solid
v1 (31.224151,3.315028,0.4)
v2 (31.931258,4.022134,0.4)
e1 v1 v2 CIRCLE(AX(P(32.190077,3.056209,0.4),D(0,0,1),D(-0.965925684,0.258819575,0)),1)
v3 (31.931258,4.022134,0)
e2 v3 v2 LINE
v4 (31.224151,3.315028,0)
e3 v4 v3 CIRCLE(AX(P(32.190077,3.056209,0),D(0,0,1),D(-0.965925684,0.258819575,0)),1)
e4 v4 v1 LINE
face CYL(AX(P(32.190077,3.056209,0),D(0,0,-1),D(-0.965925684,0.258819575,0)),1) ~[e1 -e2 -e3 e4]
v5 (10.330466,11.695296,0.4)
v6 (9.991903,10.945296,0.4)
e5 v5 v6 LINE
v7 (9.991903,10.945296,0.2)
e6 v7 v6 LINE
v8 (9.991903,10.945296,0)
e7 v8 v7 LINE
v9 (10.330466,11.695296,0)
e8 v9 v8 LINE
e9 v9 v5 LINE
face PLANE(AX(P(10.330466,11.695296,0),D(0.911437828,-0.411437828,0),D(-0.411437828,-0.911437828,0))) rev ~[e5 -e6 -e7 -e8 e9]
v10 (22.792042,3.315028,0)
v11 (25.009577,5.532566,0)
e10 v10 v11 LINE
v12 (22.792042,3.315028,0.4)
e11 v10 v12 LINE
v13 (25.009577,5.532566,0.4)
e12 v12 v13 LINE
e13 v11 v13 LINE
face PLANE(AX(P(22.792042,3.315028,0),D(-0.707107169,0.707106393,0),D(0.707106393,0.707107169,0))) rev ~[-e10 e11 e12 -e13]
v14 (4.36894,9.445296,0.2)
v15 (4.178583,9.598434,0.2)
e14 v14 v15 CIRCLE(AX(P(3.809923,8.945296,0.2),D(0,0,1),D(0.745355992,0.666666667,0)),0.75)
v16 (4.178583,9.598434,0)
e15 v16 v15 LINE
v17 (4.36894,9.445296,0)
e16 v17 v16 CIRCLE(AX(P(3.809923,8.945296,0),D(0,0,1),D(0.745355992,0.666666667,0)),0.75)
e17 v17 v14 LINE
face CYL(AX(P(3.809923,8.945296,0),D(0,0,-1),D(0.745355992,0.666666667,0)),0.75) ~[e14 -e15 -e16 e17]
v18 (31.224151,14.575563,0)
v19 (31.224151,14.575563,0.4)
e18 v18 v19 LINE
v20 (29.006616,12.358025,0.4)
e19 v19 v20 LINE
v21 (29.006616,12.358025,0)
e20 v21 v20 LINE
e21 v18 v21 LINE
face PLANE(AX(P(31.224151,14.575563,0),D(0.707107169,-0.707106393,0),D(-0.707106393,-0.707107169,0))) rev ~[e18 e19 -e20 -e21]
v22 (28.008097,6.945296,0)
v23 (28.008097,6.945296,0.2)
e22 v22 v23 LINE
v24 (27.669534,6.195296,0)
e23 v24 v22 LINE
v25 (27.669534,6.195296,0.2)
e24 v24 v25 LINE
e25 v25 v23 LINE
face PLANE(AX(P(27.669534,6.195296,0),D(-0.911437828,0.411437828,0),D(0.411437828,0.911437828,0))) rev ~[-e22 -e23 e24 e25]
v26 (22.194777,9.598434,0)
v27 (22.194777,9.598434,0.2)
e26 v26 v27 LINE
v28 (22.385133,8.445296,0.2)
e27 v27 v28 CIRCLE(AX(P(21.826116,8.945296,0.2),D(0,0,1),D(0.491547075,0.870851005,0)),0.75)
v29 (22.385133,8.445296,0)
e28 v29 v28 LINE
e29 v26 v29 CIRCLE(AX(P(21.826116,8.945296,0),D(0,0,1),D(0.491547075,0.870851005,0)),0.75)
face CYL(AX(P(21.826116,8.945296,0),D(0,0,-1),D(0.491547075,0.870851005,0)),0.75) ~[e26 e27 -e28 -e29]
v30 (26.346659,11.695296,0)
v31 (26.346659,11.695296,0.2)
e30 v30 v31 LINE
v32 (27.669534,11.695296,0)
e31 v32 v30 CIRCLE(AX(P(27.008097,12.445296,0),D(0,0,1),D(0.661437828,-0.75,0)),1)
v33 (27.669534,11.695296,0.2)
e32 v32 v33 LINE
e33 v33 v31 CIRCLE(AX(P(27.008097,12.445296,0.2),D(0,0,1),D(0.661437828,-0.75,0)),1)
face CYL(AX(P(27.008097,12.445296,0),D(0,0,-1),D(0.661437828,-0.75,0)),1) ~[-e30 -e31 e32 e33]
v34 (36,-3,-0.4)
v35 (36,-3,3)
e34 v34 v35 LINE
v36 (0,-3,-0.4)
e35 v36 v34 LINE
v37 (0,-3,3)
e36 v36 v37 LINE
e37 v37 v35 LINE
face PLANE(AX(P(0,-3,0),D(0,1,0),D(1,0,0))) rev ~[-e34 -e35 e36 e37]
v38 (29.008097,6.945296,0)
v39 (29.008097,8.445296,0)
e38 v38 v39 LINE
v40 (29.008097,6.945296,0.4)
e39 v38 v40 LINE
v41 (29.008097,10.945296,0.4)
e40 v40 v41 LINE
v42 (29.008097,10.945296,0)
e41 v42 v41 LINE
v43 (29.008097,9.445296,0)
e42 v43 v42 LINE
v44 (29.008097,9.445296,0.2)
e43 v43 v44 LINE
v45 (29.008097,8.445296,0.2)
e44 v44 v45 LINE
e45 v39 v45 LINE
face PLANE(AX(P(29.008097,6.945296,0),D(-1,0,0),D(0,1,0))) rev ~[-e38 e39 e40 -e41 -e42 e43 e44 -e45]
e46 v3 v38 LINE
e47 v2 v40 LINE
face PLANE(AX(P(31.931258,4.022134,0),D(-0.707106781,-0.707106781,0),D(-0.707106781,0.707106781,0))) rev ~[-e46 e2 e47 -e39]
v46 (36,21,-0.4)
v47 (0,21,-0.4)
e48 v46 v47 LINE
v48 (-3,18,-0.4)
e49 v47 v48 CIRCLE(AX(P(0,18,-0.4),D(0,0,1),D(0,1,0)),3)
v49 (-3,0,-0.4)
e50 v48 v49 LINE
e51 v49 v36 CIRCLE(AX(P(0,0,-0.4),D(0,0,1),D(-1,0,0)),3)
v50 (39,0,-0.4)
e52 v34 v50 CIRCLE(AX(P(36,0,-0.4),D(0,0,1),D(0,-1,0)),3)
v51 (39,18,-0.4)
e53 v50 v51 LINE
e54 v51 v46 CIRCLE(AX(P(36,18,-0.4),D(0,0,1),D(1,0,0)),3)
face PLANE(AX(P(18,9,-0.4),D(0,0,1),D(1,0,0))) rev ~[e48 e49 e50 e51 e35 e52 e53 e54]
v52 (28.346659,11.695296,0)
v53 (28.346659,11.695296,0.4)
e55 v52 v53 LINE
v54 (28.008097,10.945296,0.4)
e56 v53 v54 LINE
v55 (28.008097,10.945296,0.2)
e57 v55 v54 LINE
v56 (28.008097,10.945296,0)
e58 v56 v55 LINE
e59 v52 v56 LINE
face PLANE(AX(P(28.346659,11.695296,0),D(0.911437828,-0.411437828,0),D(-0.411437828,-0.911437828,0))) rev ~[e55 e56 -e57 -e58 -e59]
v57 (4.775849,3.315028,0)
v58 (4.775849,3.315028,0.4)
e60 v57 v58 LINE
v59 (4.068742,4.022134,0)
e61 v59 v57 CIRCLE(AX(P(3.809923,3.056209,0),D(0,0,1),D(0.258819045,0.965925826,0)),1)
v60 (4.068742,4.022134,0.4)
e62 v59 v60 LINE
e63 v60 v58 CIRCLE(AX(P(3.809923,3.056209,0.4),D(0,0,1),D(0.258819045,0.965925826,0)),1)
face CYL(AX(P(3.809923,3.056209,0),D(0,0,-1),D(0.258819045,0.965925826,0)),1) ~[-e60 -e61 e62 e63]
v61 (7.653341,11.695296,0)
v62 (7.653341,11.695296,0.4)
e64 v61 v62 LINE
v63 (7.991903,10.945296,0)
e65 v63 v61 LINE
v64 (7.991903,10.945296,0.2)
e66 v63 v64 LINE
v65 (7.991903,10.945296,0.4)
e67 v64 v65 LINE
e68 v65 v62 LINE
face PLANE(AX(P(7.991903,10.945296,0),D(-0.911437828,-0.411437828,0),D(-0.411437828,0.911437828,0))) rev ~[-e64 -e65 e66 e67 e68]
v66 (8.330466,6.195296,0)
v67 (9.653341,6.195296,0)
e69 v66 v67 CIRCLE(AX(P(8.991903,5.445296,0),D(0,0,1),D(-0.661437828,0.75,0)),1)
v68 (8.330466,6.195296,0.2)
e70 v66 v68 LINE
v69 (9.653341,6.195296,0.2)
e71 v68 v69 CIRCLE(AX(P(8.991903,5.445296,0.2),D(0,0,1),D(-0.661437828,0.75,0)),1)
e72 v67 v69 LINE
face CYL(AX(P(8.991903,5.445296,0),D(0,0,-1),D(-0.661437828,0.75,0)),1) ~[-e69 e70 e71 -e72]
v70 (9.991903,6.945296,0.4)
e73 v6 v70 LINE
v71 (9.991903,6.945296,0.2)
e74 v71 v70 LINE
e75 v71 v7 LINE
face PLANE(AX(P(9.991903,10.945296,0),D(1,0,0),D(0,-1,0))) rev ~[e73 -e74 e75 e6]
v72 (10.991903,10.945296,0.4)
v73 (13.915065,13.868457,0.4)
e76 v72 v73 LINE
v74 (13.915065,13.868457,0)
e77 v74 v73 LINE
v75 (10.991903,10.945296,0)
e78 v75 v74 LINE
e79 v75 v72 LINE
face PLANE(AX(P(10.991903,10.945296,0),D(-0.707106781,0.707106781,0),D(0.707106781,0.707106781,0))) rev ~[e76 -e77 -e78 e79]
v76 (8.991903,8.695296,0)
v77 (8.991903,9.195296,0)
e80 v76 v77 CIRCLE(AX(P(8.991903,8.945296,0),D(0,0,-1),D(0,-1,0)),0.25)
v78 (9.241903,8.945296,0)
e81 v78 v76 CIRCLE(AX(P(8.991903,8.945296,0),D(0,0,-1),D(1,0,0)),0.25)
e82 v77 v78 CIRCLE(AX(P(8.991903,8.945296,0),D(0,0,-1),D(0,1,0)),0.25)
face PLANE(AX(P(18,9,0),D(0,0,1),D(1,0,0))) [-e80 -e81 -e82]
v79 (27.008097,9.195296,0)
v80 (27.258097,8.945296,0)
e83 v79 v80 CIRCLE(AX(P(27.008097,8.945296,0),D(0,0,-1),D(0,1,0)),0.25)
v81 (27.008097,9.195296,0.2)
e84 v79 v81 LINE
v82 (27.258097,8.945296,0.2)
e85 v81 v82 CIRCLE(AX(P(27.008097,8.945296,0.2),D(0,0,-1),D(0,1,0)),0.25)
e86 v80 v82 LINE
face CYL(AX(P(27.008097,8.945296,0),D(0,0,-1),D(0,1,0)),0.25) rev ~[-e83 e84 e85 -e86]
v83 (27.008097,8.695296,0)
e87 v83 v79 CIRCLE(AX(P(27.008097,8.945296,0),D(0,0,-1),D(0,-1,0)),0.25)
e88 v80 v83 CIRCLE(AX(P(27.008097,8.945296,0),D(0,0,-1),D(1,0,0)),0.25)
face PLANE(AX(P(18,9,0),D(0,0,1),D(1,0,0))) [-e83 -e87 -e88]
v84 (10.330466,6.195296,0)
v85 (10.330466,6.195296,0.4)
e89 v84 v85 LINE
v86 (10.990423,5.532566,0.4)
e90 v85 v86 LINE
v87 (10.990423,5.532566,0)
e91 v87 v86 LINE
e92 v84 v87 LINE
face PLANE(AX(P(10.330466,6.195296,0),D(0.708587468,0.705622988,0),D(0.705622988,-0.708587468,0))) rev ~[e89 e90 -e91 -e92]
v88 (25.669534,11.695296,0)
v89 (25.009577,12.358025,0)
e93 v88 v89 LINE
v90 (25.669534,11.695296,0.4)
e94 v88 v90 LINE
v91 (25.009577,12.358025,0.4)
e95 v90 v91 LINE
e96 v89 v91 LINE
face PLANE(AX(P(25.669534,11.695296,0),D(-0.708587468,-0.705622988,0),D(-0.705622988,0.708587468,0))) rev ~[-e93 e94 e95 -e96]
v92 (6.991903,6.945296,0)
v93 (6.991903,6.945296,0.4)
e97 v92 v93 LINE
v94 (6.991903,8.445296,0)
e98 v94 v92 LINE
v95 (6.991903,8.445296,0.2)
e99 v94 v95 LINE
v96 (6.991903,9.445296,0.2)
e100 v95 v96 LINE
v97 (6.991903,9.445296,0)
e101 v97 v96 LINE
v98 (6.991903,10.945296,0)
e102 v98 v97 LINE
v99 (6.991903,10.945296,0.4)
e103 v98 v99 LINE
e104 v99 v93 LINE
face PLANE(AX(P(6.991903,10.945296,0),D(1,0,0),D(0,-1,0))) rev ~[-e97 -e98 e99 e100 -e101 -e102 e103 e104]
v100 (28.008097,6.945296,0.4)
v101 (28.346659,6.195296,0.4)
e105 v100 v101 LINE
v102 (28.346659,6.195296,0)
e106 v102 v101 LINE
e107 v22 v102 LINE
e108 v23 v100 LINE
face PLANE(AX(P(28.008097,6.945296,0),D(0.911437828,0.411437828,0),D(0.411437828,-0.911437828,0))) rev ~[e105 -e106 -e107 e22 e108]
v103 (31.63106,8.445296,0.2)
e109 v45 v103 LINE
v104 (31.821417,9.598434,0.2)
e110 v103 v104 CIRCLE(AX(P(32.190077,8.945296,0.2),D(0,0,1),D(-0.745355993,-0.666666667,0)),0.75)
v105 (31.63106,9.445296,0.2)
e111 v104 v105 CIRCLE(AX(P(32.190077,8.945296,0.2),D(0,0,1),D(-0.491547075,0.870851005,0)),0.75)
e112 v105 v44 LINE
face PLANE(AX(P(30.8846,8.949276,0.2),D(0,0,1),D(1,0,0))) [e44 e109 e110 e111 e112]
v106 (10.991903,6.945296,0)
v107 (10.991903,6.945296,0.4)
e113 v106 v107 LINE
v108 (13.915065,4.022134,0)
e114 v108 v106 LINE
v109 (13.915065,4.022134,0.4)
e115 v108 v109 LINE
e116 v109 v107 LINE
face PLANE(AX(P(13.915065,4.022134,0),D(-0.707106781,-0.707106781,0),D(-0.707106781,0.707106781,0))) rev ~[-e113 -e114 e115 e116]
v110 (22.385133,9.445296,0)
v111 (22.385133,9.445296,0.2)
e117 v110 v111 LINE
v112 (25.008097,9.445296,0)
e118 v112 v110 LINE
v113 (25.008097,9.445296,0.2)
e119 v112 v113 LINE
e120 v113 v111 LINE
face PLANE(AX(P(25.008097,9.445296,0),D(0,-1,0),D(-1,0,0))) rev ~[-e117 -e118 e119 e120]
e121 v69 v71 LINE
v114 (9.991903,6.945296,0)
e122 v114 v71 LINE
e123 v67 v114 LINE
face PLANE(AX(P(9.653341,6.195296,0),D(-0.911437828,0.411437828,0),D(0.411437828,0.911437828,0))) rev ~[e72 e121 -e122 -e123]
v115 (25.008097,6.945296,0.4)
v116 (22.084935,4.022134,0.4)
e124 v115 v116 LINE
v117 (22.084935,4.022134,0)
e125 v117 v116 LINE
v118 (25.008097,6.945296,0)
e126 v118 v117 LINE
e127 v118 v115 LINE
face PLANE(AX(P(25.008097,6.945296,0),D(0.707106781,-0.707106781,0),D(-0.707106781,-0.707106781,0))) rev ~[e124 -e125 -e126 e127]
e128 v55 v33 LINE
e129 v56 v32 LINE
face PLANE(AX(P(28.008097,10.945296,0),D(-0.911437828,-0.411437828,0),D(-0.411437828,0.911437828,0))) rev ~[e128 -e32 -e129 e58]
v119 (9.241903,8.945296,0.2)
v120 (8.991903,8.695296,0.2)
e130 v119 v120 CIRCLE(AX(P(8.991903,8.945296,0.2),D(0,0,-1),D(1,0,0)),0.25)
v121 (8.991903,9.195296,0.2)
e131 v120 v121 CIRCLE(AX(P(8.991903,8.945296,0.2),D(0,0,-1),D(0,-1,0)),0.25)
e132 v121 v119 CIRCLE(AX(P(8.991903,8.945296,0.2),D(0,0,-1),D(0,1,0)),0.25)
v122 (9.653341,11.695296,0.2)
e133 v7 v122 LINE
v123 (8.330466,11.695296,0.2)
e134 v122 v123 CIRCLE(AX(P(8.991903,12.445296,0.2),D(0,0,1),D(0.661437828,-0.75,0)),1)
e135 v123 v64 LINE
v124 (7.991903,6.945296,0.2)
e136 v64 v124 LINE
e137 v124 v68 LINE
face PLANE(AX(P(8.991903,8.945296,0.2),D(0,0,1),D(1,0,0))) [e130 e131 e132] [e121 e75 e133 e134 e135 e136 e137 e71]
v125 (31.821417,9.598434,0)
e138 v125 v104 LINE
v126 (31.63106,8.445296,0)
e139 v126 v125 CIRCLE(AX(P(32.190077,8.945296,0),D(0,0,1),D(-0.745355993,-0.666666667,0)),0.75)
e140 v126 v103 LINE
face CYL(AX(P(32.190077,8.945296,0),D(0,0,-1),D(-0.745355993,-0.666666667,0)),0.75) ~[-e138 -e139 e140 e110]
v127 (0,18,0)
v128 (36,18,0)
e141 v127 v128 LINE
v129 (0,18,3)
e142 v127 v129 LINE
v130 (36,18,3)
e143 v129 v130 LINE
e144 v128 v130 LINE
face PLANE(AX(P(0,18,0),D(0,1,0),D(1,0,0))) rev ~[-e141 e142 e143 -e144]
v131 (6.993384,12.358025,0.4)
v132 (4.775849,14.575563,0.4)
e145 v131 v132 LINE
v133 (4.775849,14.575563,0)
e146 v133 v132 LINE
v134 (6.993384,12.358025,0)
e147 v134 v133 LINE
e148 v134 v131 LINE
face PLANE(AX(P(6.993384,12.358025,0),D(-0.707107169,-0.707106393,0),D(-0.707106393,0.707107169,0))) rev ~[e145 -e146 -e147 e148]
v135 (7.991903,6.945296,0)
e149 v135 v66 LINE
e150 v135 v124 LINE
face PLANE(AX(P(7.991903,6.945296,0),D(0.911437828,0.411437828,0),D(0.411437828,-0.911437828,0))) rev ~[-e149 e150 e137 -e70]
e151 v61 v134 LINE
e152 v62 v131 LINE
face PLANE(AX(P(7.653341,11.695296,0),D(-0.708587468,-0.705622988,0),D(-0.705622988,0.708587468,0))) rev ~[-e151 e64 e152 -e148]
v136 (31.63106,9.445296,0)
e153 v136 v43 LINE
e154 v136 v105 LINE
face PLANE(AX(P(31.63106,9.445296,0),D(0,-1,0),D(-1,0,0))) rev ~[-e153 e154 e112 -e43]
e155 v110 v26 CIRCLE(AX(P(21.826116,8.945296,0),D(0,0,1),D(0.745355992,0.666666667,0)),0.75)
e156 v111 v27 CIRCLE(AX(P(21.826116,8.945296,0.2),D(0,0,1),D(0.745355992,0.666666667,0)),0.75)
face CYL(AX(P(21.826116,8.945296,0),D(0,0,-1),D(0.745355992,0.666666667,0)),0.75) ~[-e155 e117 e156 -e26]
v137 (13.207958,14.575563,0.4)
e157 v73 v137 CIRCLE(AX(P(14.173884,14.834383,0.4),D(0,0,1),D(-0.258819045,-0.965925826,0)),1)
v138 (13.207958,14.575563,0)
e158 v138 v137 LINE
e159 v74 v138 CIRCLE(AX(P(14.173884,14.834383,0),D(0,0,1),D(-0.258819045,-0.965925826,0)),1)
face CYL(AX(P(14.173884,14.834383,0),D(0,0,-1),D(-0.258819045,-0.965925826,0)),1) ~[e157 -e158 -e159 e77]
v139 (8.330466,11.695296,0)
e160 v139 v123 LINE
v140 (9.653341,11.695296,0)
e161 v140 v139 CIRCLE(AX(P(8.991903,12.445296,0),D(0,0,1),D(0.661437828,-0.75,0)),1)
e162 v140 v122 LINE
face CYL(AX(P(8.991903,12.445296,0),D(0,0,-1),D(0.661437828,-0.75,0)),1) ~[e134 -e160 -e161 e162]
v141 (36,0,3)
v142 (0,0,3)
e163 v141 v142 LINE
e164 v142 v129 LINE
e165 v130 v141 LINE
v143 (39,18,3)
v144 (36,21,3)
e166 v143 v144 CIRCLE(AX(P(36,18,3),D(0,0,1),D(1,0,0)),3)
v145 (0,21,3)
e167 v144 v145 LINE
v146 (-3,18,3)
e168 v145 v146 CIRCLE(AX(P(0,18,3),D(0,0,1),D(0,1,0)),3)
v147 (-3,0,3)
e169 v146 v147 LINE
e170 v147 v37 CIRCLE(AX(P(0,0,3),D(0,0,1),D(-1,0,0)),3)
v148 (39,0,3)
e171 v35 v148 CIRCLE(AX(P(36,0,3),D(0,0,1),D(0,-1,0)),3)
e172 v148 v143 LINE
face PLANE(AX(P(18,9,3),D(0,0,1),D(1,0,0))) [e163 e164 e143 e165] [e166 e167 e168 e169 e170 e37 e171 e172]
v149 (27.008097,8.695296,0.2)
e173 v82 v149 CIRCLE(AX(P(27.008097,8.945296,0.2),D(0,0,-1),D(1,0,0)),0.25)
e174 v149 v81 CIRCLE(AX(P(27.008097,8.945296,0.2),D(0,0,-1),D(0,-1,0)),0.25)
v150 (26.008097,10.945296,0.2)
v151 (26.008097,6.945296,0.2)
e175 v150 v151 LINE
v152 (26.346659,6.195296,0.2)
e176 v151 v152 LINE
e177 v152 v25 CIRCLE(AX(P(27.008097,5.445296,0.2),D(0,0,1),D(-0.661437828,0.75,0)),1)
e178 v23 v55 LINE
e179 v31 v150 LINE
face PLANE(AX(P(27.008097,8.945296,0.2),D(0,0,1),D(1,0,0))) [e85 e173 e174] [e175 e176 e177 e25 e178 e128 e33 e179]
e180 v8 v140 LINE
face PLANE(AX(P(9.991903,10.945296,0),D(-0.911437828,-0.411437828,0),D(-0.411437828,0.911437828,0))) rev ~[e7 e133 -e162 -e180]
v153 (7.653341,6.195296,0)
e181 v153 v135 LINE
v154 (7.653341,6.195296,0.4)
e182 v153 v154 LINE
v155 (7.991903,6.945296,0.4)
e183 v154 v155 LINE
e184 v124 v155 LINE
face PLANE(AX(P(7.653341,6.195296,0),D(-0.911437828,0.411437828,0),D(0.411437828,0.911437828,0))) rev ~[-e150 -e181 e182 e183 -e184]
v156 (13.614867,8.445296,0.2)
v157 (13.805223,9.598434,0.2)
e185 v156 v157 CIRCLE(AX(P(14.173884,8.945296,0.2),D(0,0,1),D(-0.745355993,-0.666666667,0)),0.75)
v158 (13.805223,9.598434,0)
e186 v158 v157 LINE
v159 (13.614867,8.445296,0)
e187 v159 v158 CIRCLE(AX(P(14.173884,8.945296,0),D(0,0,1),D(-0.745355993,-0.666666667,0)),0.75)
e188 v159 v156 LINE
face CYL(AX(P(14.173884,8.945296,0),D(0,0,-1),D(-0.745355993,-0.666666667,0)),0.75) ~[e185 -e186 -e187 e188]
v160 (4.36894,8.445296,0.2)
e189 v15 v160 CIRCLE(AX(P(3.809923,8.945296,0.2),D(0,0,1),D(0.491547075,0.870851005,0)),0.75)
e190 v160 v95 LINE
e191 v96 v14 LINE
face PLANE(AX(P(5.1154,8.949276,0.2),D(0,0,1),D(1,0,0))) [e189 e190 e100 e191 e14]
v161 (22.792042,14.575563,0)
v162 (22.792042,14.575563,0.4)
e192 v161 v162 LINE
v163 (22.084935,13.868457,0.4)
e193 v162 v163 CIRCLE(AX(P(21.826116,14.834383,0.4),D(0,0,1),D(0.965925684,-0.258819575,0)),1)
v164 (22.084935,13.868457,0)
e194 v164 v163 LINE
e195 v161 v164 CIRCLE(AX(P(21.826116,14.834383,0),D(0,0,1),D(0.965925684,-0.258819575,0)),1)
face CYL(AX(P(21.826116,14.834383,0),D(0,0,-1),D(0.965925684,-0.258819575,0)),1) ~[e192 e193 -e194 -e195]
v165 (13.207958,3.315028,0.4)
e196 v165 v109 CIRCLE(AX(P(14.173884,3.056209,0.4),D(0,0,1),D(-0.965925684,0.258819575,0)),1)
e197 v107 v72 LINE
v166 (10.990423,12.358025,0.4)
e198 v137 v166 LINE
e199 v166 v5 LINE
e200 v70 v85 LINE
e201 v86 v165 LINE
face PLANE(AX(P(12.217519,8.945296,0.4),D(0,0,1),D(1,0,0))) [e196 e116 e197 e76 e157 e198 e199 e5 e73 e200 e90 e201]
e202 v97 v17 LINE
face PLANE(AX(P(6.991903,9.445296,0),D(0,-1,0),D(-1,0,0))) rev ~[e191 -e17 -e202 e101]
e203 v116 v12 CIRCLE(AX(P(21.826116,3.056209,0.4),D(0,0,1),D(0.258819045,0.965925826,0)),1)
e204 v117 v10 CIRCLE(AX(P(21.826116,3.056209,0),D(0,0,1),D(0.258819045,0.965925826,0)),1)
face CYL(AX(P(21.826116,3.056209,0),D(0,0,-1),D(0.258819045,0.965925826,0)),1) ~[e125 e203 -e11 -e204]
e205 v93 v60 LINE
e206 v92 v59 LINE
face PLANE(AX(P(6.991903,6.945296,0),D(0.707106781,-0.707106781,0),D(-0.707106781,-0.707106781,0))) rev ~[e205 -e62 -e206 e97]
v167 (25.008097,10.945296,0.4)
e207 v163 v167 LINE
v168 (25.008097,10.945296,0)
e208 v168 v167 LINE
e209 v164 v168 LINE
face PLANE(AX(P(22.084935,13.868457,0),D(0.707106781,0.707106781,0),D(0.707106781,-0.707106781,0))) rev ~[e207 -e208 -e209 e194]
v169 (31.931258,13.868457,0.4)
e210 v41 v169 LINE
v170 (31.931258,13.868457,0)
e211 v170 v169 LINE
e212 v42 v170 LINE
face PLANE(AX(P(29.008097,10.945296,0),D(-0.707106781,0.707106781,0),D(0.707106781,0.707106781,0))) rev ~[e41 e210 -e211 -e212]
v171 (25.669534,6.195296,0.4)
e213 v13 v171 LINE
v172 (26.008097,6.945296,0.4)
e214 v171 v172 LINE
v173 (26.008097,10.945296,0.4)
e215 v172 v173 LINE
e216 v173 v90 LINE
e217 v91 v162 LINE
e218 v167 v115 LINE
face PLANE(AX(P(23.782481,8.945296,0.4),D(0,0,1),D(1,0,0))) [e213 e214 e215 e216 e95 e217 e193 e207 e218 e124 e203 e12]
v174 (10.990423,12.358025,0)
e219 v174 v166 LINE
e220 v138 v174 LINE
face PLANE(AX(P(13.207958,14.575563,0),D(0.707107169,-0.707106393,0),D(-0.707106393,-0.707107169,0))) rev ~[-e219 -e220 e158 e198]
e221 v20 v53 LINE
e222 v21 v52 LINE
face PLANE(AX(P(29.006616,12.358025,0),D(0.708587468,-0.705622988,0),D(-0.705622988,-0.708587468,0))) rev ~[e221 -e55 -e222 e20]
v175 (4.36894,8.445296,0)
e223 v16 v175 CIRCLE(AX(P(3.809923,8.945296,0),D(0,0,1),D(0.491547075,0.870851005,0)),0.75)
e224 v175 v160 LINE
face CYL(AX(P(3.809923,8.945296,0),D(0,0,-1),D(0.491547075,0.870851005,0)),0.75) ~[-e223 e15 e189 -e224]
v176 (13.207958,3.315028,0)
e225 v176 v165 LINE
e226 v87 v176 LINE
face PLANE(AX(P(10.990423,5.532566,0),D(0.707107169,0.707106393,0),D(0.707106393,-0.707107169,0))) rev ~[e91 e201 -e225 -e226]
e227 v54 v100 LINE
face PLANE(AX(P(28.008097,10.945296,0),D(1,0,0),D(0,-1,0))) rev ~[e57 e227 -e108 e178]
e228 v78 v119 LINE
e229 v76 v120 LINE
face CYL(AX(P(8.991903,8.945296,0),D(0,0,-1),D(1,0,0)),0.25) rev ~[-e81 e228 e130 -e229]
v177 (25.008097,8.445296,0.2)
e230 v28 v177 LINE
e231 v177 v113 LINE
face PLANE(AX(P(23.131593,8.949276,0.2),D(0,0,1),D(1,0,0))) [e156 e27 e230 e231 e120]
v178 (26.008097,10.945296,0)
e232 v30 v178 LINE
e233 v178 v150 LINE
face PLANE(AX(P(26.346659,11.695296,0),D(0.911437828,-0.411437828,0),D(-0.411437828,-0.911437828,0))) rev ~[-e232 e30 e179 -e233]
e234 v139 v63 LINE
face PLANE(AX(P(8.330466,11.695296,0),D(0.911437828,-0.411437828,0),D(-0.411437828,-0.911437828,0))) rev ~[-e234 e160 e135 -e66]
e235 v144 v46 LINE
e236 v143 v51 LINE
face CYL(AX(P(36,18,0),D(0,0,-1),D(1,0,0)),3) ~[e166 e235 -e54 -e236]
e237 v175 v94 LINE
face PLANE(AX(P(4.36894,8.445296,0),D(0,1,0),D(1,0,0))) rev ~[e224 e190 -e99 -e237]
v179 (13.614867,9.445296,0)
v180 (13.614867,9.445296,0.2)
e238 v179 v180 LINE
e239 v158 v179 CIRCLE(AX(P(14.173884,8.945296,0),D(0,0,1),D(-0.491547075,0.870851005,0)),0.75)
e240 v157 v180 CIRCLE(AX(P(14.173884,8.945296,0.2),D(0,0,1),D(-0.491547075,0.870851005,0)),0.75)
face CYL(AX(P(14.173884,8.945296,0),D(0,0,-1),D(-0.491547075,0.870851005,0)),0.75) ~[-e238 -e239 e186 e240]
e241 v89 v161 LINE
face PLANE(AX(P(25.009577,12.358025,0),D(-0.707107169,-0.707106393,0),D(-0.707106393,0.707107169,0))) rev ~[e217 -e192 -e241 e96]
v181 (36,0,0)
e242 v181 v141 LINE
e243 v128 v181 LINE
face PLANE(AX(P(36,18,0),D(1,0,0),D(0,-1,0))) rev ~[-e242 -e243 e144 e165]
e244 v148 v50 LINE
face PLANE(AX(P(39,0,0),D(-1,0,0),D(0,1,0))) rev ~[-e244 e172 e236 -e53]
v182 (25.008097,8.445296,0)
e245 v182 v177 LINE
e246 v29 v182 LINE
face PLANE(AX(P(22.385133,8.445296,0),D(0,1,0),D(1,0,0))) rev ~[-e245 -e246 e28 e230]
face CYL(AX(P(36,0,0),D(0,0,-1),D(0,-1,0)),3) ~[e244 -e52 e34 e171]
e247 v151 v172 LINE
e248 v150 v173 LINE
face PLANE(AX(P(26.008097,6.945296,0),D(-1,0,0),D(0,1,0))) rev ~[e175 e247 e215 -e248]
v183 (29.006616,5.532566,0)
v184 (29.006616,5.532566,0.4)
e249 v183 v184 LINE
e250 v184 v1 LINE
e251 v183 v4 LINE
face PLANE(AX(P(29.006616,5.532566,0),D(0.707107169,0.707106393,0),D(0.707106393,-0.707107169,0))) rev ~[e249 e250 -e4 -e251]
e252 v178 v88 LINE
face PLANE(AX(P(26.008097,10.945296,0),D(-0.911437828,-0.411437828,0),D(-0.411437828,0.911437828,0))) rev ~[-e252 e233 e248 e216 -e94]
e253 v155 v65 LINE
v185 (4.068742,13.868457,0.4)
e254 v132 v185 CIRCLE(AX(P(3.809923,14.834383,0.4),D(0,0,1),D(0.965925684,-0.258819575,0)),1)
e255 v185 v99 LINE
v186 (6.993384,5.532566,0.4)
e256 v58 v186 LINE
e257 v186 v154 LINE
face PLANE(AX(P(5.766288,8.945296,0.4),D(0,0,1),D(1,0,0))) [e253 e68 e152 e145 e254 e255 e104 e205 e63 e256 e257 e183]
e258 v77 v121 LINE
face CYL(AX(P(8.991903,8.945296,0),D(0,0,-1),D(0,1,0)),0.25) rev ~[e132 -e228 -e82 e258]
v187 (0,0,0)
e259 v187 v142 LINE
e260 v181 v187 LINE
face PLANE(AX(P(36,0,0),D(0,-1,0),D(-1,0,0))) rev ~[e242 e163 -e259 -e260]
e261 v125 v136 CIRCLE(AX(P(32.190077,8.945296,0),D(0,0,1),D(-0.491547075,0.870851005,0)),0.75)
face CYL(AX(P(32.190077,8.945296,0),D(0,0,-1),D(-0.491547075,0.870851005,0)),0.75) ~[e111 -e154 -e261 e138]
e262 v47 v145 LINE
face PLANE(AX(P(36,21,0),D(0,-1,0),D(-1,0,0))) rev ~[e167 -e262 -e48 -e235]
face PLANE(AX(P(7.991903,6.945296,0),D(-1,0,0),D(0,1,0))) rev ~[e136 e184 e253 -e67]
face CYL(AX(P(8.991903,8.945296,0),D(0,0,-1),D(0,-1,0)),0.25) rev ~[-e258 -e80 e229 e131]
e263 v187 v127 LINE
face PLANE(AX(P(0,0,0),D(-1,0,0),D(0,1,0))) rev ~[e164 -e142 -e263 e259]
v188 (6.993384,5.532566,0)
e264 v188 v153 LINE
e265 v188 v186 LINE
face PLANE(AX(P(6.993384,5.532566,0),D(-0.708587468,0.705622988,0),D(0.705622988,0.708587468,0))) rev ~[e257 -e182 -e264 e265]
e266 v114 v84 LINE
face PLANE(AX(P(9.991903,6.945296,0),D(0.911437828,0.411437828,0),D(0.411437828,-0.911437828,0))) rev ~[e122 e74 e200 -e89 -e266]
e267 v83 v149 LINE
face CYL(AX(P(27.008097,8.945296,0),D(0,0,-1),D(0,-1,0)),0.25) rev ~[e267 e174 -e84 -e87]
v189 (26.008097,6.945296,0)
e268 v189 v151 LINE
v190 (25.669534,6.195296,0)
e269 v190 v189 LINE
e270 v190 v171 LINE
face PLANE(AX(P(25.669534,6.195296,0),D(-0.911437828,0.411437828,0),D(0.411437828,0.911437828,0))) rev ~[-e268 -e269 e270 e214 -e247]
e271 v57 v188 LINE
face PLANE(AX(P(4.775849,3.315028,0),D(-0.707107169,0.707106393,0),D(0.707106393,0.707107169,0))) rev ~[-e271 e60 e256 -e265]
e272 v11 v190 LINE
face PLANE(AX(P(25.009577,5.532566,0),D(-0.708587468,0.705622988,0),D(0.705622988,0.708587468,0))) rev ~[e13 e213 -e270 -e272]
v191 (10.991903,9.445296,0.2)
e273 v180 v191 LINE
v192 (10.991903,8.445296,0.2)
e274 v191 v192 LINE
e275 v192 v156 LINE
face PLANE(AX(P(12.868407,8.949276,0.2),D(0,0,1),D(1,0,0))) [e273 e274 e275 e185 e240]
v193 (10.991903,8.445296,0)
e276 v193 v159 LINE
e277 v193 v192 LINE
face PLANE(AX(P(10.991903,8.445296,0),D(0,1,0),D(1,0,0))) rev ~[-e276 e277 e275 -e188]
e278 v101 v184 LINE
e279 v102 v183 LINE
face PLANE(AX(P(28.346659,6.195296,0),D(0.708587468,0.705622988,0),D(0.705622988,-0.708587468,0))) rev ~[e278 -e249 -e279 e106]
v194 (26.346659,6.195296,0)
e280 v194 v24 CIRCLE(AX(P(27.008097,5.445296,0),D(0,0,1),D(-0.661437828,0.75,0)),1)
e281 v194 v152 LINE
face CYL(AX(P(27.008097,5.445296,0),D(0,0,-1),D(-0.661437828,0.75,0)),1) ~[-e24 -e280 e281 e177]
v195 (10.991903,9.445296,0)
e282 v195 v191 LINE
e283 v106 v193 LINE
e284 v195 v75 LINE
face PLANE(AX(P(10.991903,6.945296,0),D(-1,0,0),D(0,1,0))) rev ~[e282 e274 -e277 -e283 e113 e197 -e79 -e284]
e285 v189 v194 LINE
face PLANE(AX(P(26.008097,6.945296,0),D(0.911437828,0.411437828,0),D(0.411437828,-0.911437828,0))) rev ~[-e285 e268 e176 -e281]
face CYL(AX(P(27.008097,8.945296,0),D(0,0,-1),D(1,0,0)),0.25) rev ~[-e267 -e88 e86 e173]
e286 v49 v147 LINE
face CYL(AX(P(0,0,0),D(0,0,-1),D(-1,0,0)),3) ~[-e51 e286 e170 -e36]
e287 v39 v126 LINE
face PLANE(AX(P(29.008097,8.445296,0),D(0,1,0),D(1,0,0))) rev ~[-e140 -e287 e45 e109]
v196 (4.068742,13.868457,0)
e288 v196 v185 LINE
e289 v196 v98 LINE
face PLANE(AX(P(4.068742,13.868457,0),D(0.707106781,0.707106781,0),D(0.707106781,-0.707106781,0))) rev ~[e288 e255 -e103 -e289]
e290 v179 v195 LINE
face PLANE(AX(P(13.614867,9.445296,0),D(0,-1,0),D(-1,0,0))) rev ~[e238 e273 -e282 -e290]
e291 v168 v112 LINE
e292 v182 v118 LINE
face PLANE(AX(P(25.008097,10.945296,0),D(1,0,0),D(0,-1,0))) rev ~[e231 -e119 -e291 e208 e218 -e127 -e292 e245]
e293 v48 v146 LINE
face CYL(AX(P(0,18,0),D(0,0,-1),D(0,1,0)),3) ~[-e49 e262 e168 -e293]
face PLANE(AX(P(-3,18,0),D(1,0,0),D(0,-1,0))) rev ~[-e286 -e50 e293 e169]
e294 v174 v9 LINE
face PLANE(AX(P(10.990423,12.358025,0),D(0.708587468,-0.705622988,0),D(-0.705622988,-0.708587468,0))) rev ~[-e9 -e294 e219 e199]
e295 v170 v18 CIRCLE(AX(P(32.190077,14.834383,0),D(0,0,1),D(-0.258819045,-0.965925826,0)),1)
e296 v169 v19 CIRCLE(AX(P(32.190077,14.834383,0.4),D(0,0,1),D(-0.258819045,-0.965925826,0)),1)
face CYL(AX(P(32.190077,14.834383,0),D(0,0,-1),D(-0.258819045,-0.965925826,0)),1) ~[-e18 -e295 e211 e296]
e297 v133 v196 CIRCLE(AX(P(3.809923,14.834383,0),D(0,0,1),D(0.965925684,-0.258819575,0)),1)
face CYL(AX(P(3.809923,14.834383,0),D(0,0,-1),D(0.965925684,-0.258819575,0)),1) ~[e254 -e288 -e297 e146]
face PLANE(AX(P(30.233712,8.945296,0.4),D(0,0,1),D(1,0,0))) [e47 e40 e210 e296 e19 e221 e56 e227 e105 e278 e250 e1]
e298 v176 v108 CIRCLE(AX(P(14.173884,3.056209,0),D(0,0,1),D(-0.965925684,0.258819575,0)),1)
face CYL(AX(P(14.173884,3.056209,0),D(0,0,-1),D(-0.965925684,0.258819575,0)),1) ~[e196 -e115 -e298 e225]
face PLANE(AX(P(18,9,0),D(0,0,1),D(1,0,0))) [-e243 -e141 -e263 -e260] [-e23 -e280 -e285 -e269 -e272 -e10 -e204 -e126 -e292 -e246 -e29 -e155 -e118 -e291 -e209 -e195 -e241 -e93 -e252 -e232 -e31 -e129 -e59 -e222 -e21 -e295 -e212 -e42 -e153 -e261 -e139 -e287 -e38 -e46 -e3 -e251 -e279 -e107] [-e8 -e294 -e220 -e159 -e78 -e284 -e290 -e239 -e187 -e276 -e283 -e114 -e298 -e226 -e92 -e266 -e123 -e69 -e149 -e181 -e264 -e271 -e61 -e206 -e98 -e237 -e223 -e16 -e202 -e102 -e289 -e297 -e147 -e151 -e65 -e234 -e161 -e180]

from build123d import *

# Parameters (mm, degrees)
F0_W     = 17.75
F0_H     = 18
F0_W_2   = 0.25
F1_DEPTH = 0.4
F2_DEPTH = 3
F3_DEPTH = 0.4
F4_DEPTH = 0.2


# Not quite as in the source:
# - a feature names something its author has since deleted; it is built from what else it names


with BuildPart() as f1:
    # F0 (on Top) → F1 (new body)
    with BuildSketch(Plane.XY):
        with BuildLine():
            Line((36, 21), (0, 21))
            ThreePointArc((0, 21), (-2.1213203436, 20.1213203436), (-3, 18))
            Line((-3, 18), (-3, 0))
            ThreePointArc((-3, 0), (-2.1213203436, -2.1213203436), (0, -3))
            Line((0, -3), (36, -3))
            ThreePointArc((36, -3), (38.1213203436, -2.1213203436), (39, 0))
            Line((39, 0), (39, 18))
            ThreePointArc((39, 18), (38.1213203436, 20.1213203436), (36, 21))
        make_face()
        Polygon((0, 0), (0, 18), (17.75, 18), (18, 18), (18.25, 18), (36, 18), (36, 0), (18.25, 0), (18, 0), (17.75, 0), align=None, mode=Mode.SUBTRACT)
        with Locations((8.875, 9)):
            Rectangle(F0_W, F0_H)
        with BuildLine():
            Line((9.6533412223, 11.6952957055), (9.9919033945, 10.9452957055))
            Line((9.9919033945, 10.9452957055), (10.3304655668, 11.6952957055))
            Line((10.3304655668, 11.6952957055), (10.9904227081, 12.3580254744))
            Line((10.9904227081, 12.3580254744), (13.2079580316, 14.5755632326))
            ThreePointArc((13.2079580316, 14.5755632326), (14.8809903029, 15.5414897832), (13.9150646707, 13.8684569817))
            Line((13.9150646707, 13.8684569817), (10.9919033945, 10.9452957055))
            Line((10.9919033945, 10.9452957055), (10.9919033945, 9.4452957055))
            Line((10.9919033945, 9.4452957055), (13.6148667214, 9.4452957055))
            ThreePointArc((13.6148667214, 9.4452957055), (13.70376764, 9.5296679116), (13.8052234095, 9.5984339593))
            ThreePointArc((13.8052234095, 9.5984339593), (14.9138690208, 8.823141097), (13.6148667214, 8.4452957055))
            Line((13.6148667214, 8.4452957055), (10.9919033945, 8.4452957055))
            Line((10.9919033945, 8.4452957055), (10.9919033945, 6.9452957055))
            Line((10.9919033945, 6.9452957055), (13.9150646707, 4.0221344294))
            ThreePointArc((13.9150646707, 4.0221344294), (14.8809903029, 2.3491016278), (13.2079580316, 3.3150281785))
            Line((13.2079580316, 3.3150281785), (10.9904227081, 5.5325659367))
            Line((10.9904227081, 5.5325659367), (10.3304655668, 6.1952957055))
            Line((10.3304655668, 6.1952957055), (9.9919033945, 6.9452957055))
            Line((9.9919033945, 6.9452957055), (9.6533412223, 6.1952957055))
            ThreePointArc((9.6533412223, 6.1952957055), (8.9919033945, 4.4452957055), (8.3304655668, 6.1952957055))
            Line((8.3304655668, 6.1952957055), (7.9919033945, 6.9452957055))
            Line((7.9919033945, 6.9452957055), (7.6533412223, 6.1952957055))
            Line((7.6533412223, 6.1952957055), (6.993384081, 5.5325659367))
            Line((6.993384081, 5.5325659367), (4.7758487575, 3.3150281785))
            ThreePointArc((4.7758487575, 3.3150281785), (3.1028164862, 2.3491016278), (4.0687421184, 4.0221344294))
            Line((4.0687421184, 4.0221344294), (6.9919033945, 6.9452957055))
            Line((6.9919033945, 6.9452957055), (6.9919033945, 8.4452957055))
            Line((6.9919033945, 8.4452957055), (4.3689400677, 8.4452957055))
            ThreePointArc((4.3689400677, 8.4452957055), (3.0699377683, 8.823141097), (4.1785833795, 9.5984339593))
            ThreePointArc((4.1785833795, 9.5984339593), (4.2800391491, 9.5296679116), (4.3689400677, 9.4452957055))
            Line((4.3689400677, 9.4452957055), (6.9919033945, 9.4452957055))
            Line((6.9919033945, 9.4452957055), (6.9919033945, 10.9452957055))
            Line((6.9919033945, 10.9452957055), (4.0687421184, 13.8684569817))
            ThreePointArc((4.0687421184, 13.8684569817), (3.1028164862, 15.5414897832), (4.7758487575, 14.5755632326))
            Line((4.7758487575, 14.5755632326), (6.993384081, 12.3580254744))
            Line((6.993384081, 12.3580254744), (7.6533412223, 11.6952957055))
            Line((7.6533412223, 11.6952957055), (7.9919033945, 10.9452957055))
            Line((7.9919033945, 10.9452957055), (8.3304655668, 11.6952957055))
            ThreePointArc((8.3304655668, 11.6952957055), (8.9919033945, 13.4452957055), (9.6533412223, 11.6952957055))
        make_face(mode=Mode.SUBTRACT)
        with Locations((27.125, 9)):
            Rectangle(F0_W, F0_H)
        with BuildLine():
            Line((27.6695344332, 11.6952957055), (28.0080966055, 10.9452957055))
            Line((28.0080966055, 10.9452957055), (28.3466587777, 11.6952957055))
            Line((28.3466587777, 11.6952957055), (29.006615919, 12.3580254744))
            Line((29.006615919, 12.3580254744), (31.2241512425, 14.5755632326))
            ThreePointArc((31.2241512425, 14.5755632326), (32.8971835138, 15.5414897832), (31.9312578816, 13.8684569817))
            Line((31.9312578816, 13.8684569817), (29.0080966055, 10.9452957055))
            Line((29.0080966055, 10.9452957055), (29.0080966055, 9.4452957055))
            Line((29.0080966055, 9.4452957055), (31.6310599323, 9.4452957055))
            ThreePointArc((31.6310599323, 9.4452957055), (31.7199608509, 9.5296679116), (31.8214166205, 9.5984339593))
            ThreePointArc((31.8214166205, 9.5984339593), (32.9300622317, 8.823141097), (31.6310599323, 8.4452957055))
            Line((31.6310599323, 8.4452957055), (29.0080966055, 8.4452957055))
            Line((29.0080966055, 8.4452957055), (29.0080966055, 6.9452957055))
            Line((29.0080966055, 6.9452957055), (31.9312578816, 4.0221344294))
            ThreePointArc((31.9312578816, 4.0221344294), (32.8971835138, 2.3491016278), (31.2241512425, 3.3150281785))
            Line((31.2241512425, 3.3150281785), (29.006615919, 5.5325659367))
            Line((29.006615919, 5.5325659367), (28.3466587777, 6.1952957055))
            Line((28.3466587777, 6.1952957055), (28.0080966055, 6.9452957055))
            Line((28.0080966055, 6.9452957055), (27.6695344332, 6.1952957055))
            ThreePointArc((27.6695344332, 6.1952957055), (27.0080966055, 4.4452957055), (26.3466587777, 6.1952957055))
            Line((26.3466587777, 6.1952957055), (26.0080966055, 6.9452957055))
            Line((26.0080966055, 6.9452957055), (25.6695344332, 6.1952957055))
            Line((25.6695344332, 6.1952957055), (25.0095772919, 5.5325659367))
            Line((25.0095772919, 5.5325659367), (22.7920419684, 3.3150281785))
            ThreePointArc((22.7920419684, 3.3150281785), (21.1190096971, 2.3491016278), (22.0849353293, 4.0221344294))
            Line((22.0849353293, 4.0221344294), (25.0080966055, 6.9452957055))
            Line((25.0080966055, 6.9452957055), (25.0080966055, 8.4452957055))
            Line((25.0080966055, 8.4452957055), (22.3851332786, 8.4452957055))
            ThreePointArc((22.3851332786, 8.4452957055), (21.0861309792, 8.823141097), (22.1947765905, 9.5984339593))
            ThreePointArc((22.1947765905, 9.5984339593), (22.29623236, 9.5296679116), (22.3851332786, 9.4452957055))
            Line((22.3851332786, 9.4452957055), (25.0080966055, 9.4452957055))
            Line((25.0080966055, 9.4452957055), (25.0080966055, 10.9452957055))
            Line((25.0080966055, 10.9452957055), (22.0849353293, 13.8684569817))
            ThreePointArc((22.0849353293, 13.8684569817), (21.1190096971, 15.5414897832), (22.7920419684, 14.5755632326))
            Line((22.7920419684, 14.5755632326), (25.0095772919, 12.3580254744))
            Line((25.0095772919, 12.3580254744), (25.6695344332, 11.6952957055))
            Line((25.6695344332, 11.6952957055), (26.0080966055, 10.9452957055))
            Line((26.0080966055, 10.9452957055), (26.3466587777, 11.6952957055))
            ThreePointArc((26.3466587777, 11.6952957055), (27.0080966055, 13.4452957055), (27.6695344332, 11.6952957055))
        make_face(mode=Mode.SUBTRACT)
        with BuildLine():
            Line((26.0080966055, 8.9452957055), (26.0080966055, 10.9452957055))
            Line((26.0080966055, 10.9452957055), (25.6695344332, 11.6952957055))
            Line((25.6695344332, 11.6952957055), (25.0095772919, 12.3580254744))
            Line((25.0095772919, 12.3580254744), (22.7920419684, 14.5755632326))
            ThreePointArc((22.7920419684, 14.5755632326), (21.1190096971, 15.5414897832), (22.0849353293, 13.8684569817))
            Line((22.0849353293, 13.8684569817), (25.0080966055, 10.9452957055))
            Line((25.0080966055, 10.9452957055), (25.0080966055, 9.4452957055))
            Line((25.0080966055, 9.4452957055), (25.0080966055, 8.9452957055))
            Line((25.0080966055, 8.9452957055), (25.0080966055, 8.4452957055))
            Line((25.0080966055, 8.4452957055), (25.0080966055, 6.9452957055))
            Line((25.0080966055, 6.9452957055), (22.0849353293, 4.0221344294))
            ThreePointArc((22.0849353293, 4.0221344294), (21.1190096971, 2.3491016278), (22.7920419684, 3.3150281785))
            Line((22.7920419684, 3.3150281785), (25.0095772919, 5.5325659367))
            Line((25.0095772919, 5.5325659367), (25.6695344332, 6.1952957055))
            Line((25.6695344332, 6.1952957055), (26.0080966055, 6.9452957055))
            Line((26.0080966055, 6.9452957055), (26.0080966055, 8.9452957055))
        make_face()
        with BuildLine():
            Line((28.3466587777, 11.6952957055), (28.0080966055, 10.9452957055))
            Line((28.0080966055, 10.9452957055), (28.0080966055, 8.9452957055))
            Line((28.0080966055, 8.9452957055), (28.0080966055, 6.9452957055))
            Line((28.0080966055, 6.9452957055), (28.3466587777, 6.1952957055))
            Line((28.3466587777, 6.1952957055), (29.006615919, 5.5325659367))
            Line((29.006615919, 5.5325659367), (31.2241512425, 3.3150281785))
            ThreePointArc((31.2241512425, 3.3150281785), (32.8971835138, 2.3491016278), (31.9312578816, 4.0221344294))
            Line((31.9312578816, 4.0221344294), (29.0080966055, 6.9452957055))
            Line((29.0080966055, 6.9452957055), (29.0080966055, 8.4452957055))
            Line((29.0080966055, 8.4452957055), (29.0080966055, 8.9452957055))
            Line((29.0080966055, 8.9452957055), (29.0080966055, 9.4452957055))
            Line((29.0080966055, 9.4452957055), (29.0080966055, 10.9452957055))
            Line((29.0080966055, 10.9452957055), (31.9312578816, 13.8684569817))
            ThreePointArc((31.9312578816, 13.8684569817), (32.8971835138, 15.5414897832), (31.2241512425, 14.5755632326))
            Line((31.2241512425, 14.5755632326), (29.006615919, 12.3580254744))
            Line((29.006615919, 12.3580254744), (28.3466587777, 11.6952957055))
        make_face()
        with BuildLine():
            Line((7.9919033945, 8.9452957055), (7.9919033945, 10.9452957055))
            Line((7.9919033945, 10.9452957055), (7.6533412223, 11.6952957055))
            Line((7.6533412223, 11.6952957055), (6.993384081, 12.3580254744))
            Line((6.993384081, 12.3580254744), (4.7758487575, 14.5755632326))
            ThreePointArc((4.7758487575, 14.5755632326), (3.1028164862, 15.5414897832), (4.0687421184, 13.8684569817))
            Line((4.0687421184, 13.8684569817), (6.9919033945, 10.9452957055))
            Line((6.9919033945, 10.9452957055), (6.9919033945, 9.4452957055))
            Line((6.9919033945, 9.4452957055), (6.9919033945, 8.9452957055))
            Line((6.9919033945, 8.9452957055), (6.9919033945, 8.4452957055))
            Line((6.9919033945, 8.4452957055), (6.9919033945, 6.9452957055))
            Line((6.9919033945, 6.9452957055), (4.0687421184, 4.0221344294))
            ThreePointArc((4.0687421184, 4.0221344294), (3.1028164862, 2.3491016278), (4.7758487575, 3.3150281785))
            Line((4.7758487575, 3.3150281785), (6.993384081, 5.5325659367))
            Line((6.993384081, 5.5325659367), (7.6533412223, 6.1952957055))
            Line((7.6533412223, 6.1952957055), (7.9919033945, 6.9452957055))
            Line((7.9919033945, 6.9452957055), (7.9919033945, 8.9452957055))
        make_face()
        with BuildLine():
            Line((9.9919033945, 10.9452957055), (9.9919033945, 8.9452957055))
            Line((9.9919033945, 8.9452957055), (9.9919033945, 6.9452957055))
            Line((9.9919033945, 6.9452957055), (10.3304655668, 6.1952957055))
            Line((10.3304655668, 6.1952957055), (10.9904227081, 5.5325659367))
            Line((10.9904227081, 5.5325659367), (13.2079580316, 3.3150281785))
            ThreePointArc((13.2079580316, 3.3150281785), (14.8809903029, 2.3491016278), (13.9150646707, 4.0221344294))
            Line((13.9150646707, 4.0221344294), (10.9919033945, 6.9452957055))
            Line((10.9919033945, 6.9452957055), (10.9919033945, 8.4452957055))
            Line((10.9919033945, 8.4452957055), (10.9919033945, 8.9452957055))
            Line((10.9919033945, 8.9452957055), (10.9919033945, 9.4452957055))
            Line((10.9919033945, 9.4452957055), (10.9919033945, 10.9452957055))
            Line((10.9919033945, 10.9452957055), (13.9150646707, 13.8684569817))
            ThreePointArc((13.9150646707, 13.8684569817), (14.8809903029, 15.5414897832), (13.2079580316, 14.5755632326))
            Line((13.2079580316, 14.5755632326), (10.9904227081, 12.3580254744))
            Line((10.9904227081, 12.3580254744), (10.3304655668, 11.6952957055))
            Line((10.3304655668, 11.6952957055), (9.9919033945, 10.9452957055))
        make_face()
        with BuildLine():
            Line((28.0080966055, 8.9452957055), (28.0080966055, 10.9452957055))
            Line((28.0080966055, 10.9452957055), (27.6695344332, 11.6952957055))
            ThreePointArc((27.6695344332, 11.6952957055), (27.0080966055, 13.4452957055), (26.3466587777, 11.6952957055))
            Line((26.3466587777, 11.6952957055), (26.0080966055, 10.9452957055))
            Line((26.0080966055, 10.9452957055), (26.0080966055, 8.9452957055))
            Line((26.0080966055, 8.9452957055), (26.0080966055, 6.9452957055))
            Line((26.0080966055, 6.9452957055), (26.3466587777, 6.1952957055))
            ThreePointArc((26.3466587777, 6.1952957055), (27.0080966055, 4.4452957055), (27.6695344332, 6.1952957055))
            Line((27.6695344332, 6.1952957055), (28.0080966055, 6.9452957055))
            Line((28.0080966055, 6.9452957055), (28.0080966055, 8.9452957055))
        make_face()
        with BuildLine():
            ThreePointArc((27.0080966055, 9.1952957055), (27.1848733008, 9.1220724008), (27.2580966055, 8.9452957055))
            ThreePointArc((27.2580966055, 8.9452957055), (27.1848733008, 8.7685190102), (27.0080966055, 8.6952957055))
            ThreePointArc((27.0080966055, 8.6952957055), (26.7580966055, 8.9452957055), (27.0080966055, 9.1952957055))
        make_face(mode=Mode.SUBTRACT)
        with BuildLine():
            Line((9.9919033945, 6.9452957055), (9.9919033945, 8.9452957055))
            Line((9.9919033945, 8.9452957055), (9.9919033945, 10.9452957055))
            Line((9.9919033945, 10.9452957055), (9.6533412223, 11.6952957055))
            ThreePointArc((9.6533412223, 11.6952957055), (8.9919033945, 13.4452957055), (8.3304655668, 11.6952957055))
            Line((8.3304655668, 11.6952957055), (7.9919033945, 10.9452957055))
            Line((7.9919033945, 10.9452957055), (7.9919033945, 8.9452957055))
            Line((7.9919033945, 8.9452957055), (7.9919033945, 6.9452957055))
            Line((7.9919033945, 6.9452957055), (8.3304655668, 6.1952957055))
            ThreePointArc((8.3304655668, 6.1952957055), (8.9919033945, 4.4452957055), (9.6533412223, 6.1952957055))
            Line((9.6533412223, 6.1952957055), (9.9919033945, 6.9452957055))
        make_face()
        with BuildLine():
            ThreePointArc((8.9919033945, 9.1952957055), (9.1686800898, 9.1220724008), (9.2419033945, 8.9452957055))
            ThreePointArc((9.2419033945, 8.9452957055), (9.1686800898, 8.7685190102), (8.9919033945, 8.6952957055))
            ThreePointArc((8.9919033945, 8.6952957055), (8.7419033945, 8.9452957055), (8.9919033945, 9.1952957055))
        make_face(mode=Mode.SUBTRACT)
        with Locations((17.875, 9)):
            Rectangle(F0_W_2, F0_H)
        with Locations((18.125, 9)):
            Rectangle(F0_W_2, F0_H)
        with BuildLine():
            Line((6.9919033945, 8.9452957055), (6.9919033945, 9.4452957055))
            Line((6.9919033945, 9.4452957055), (4.3689400677, 9.4452957055))
            ThreePointArc((4.3689400677, 9.4452957055), (4.2800391491, 9.5296679116), (4.1785833795, 9.5984339593))
            ThreePointArc((4.1785833795, 9.5984339593), (3.0699377683, 8.823141097), (4.3689400677, 8.4452957055))
            Line((4.3689400677, 8.4452957055), (6.9919033945, 8.4452957055))
            Line((6.9919033945, 8.4452957055), (6.9919033945, 8.9452957055))
        make_face()
        with BuildLine():
            Line((31.6310599323, 9.4452957055), (29.0080966055, 9.4452957055))
            Line((29.0080966055, 9.4452957055), (29.0080966055, 8.9452957055))
            Line((29.0080966055, 8.9452957055), (29.0080966055, 8.4452957055))
            Line((29.0080966055, 8.4452957055), (31.6310599323, 8.4452957055))
            ThreePointArc((31.6310599323, 8.4452957055), (32.9300622317, 8.823141097), (31.8214166205, 9.5984339593))
            ThreePointArc((31.8214166205, 9.5984339593), (31.7199608509, 9.5296679116), (31.6310599323, 9.4452957055))
        make_face()
        with BuildLine():
            Line((25.0080966055, 8.9452957055), (25.0080966055, 9.4452957055))
            Line((25.0080966055, 9.4452957055), (22.3851332786, 9.4452957055))
            ThreePointArc((22.3851332786, 9.4452957055), (22.29623236, 9.5296679116), (22.1947765905, 9.5984339593))
            ThreePointArc((22.1947765905, 9.5984339593), (21.0861309792, 8.823141097), (22.3851332786, 8.4452957055))
            Line((22.3851332786, 8.4452957055), (25.0080966055, 8.4452957055))
            Line((25.0080966055, 8.4452957055), (25.0080966055, 8.9452957055))
        make_face()
        with BuildLine():
            Line((13.6148667214, 9.4452957055), (10.9919033945, 9.4452957055))
            Line((10.9919033945, 9.4452957055), (10.9919033945, 8.9452957055))
            Line((10.9919033945, 8.9452957055), (10.9919033945, 8.4452957055))
            Line((10.9919033945, 8.4452957055), (13.6148667214, 8.4452957055))
            ThreePointArc((13.6148667214, 8.4452957055), (14.9138690208, 8.823141097), (13.8052234095, 9.5984339593))
            ThreePointArc((13.8052234095, 9.5984339593), (13.70376764, 9.5296679116), (13.6148667214, 9.4452957055))
        make_face()
        with BuildLine():
            ThreePointArc((8.9919033945, 8.6952957055), (9.1686800898, 8.7685190102), (9.2419033945, 8.9452957055))
            ThreePointArc((9.2419033945, 8.9452957055), (9.1686800898, 9.1220724008), (8.9919033945, 9.1952957055))
            Line((8.9919033945, 9.1952957055), (8.9919033945, 8.6952957055))
        make_face()
        with BuildLine():
            ThreePointArc((27.0080966055, 8.6952957055), (27.1848733008, 8.7685190102), (27.2580966055, 8.9452957055))
            ThreePointArc((27.2580966055, 8.9452957055), (27.1848733008, 9.1220724008), (27.0080966055, 9.1952957055))
            Line((27.0080966055, 9.1952957055), (27.0080966055, 8.6952957055))
        make_face()
        with BuildLine():
            Line((8.9919033945, 8.6952957055), (8.9919033945, 9.1952957055))
            ThreePointArc((8.9919033945, 9.1952957055), (8.7419033945, 8.9452957055), (8.9919033945, 8.6952957055))
        make_face()
        with BuildLine():
            Line((27.0080966055, 8.6952957055), (27.0080966055, 9.1952957055))
            ThreePointArc((27.0080966055, 9.1952957055), (26.7580966055, 8.9452957055), (27.0080966055, 8.6952957055))
        make_face()
    extrude(amount=-F1_DEPTH)

    # F0 (on Top) → F2 (join)
    with BuildSketch(Plane.XY):
        with BuildLine():
            Line((36, 21), (0, 21))
            ThreePointArc((0, 21), (-2.1213203436, 20.1213203436), (-3, 18))
            Line((-3, 18), (-3, 0))
            ThreePointArc((-3, 0), (-2.1213203436, -2.1213203436), (0, -3))
            Line((0, -3), (36, -3))
            ThreePointArc((36, -3), (38.1213203436, -2.1213203436), (39, 0))
            Line((39, 0), (39, 18))
            ThreePointArc((39, 18), (38.1213203436, 20.1213203436), (36, 21))
        make_face()
        Polygon((0, 0), (0, 18), (17.75, 18), (18, 18), (18.25, 18), (36, 18), (36, 0), (18.25, 0), (18, 0), (17.75, 0), align=None, mode=Mode.SUBTRACT)
    extrude(amount=F2_DEPTH)

    # F0 (on Top) → F3 (join)
    with BuildSketch(Plane.XY):
        with BuildLine():
            Line((7.9919033945, 8.9452957055), (7.9919033945, 10.9452957055))
            Line((7.9919033945, 10.9452957055), (7.6533412223, 11.6952957055))
            Line((7.6533412223, 11.6952957055), (6.993384081, 12.3580254744))
            Line((6.993384081, 12.3580254744), (4.7758487575, 14.5755632326))
            ThreePointArc((4.7758487575, 14.5755632326), (3.1028164862, 15.5414897832), (4.0687421184, 13.8684569817))
            Line((4.0687421184, 13.8684569817), (6.9919033945, 10.9452957055))
            Line((6.9919033945, 10.9452957055), (6.9919033945, 9.4452957055))
            Line((6.9919033945, 9.4452957055), (6.9919033945, 8.9452957055))
            Line((6.9919033945, 8.9452957055), (6.9919033945, 8.4452957055))
            Line((6.9919033945, 8.4452957055), (6.9919033945, 6.9452957055))
            Line((6.9919033945, 6.9452957055), (4.0687421184, 4.0221344294))
            ThreePointArc((4.0687421184, 4.0221344294), (3.1028164862, 2.3491016278), (4.7758487575, 3.3150281785))
            Line((4.7758487575, 3.3150281785), (6.993384081, 5.5325659367))
            Line((6.993384081, 5.5325659367), (7.6533412223, 6.1952957055))
            Line((7.6533412223, 6.1952957055), (7.9919033945, 6.9452957055))
            Line((7.9919033945, 6.9452957055), (7.9919033945, 8.9452957055))
        make_face()
        with BuildLine():
            Line((9.9919033945, 10.9452957055), (9.9919033945, 8.9452957055))
            Line((9.9919033945, 8.9452957055), (9.9919033945, 6.9452957055))
            Line((9.9919033945, 6.9452957055), (10.3304655668, 6.1952957055))
            Line((10.3304655668, 6.1952957055), (10.9904227081, 5.5325659367))
            Line((10.9904227081, 5.5325659367), (13.2079580316, 3.3150281785))
            ThreePointArc((13.2079580316, 3.3150281785), (14.8809903029, 2.3491016278), (13.9150646707, 4.0221344294))
            Line((13.9150646707, 4.0221344294), (10.9919033945, 6.9452957055))
            Line((10.9919033945, 6.9452957055), (10.9919033945, 8.4452957055))
            Line((10.9919033945, 8.4452957055), (10.9919033945, 8.9452957055))
            Line((10.9919033945, 8.9452957055), (10.9919033945, 9.4452957055))
            Line((10.9919033945, 9.4452957055), (10.9919033945, 10.9452957055))
            Line((10.9919033945, 10.9452957055), (13.9150646707, 13.8684569817))
            ThreePointArc((13.9150646707, 13.8684569817), (14.8809903029, 15.5414897832), (13.2079580316, 14.5755632326))
            Line((13.2079580316, 14.5755632326), (10.9904227081, 12.3580254744))
            Line((10.9904227081, 12.3580254744), (10.3304655668, 11.6952957055))
            Line((10.3304655668, 11.6952957055), (9.9919033945, 10.9452957055))
        make_face()
        with BuildLine():
            Line((26.0080966055, 8.9452957055), (26.0080966055, 10.9452957055))
            Line((26.0080966055, 10.9452957055), (25.6695344332, 11.6952957055))
            Line((25.6695344332, 11.6952957055), (25.0095772919, 12.3580254744))
            Line((25.0095772919, 12.3580254744), (22.7920419684, 14.5755632326))
            ThreePointArc((22.7920419684, 14.5755632326), (21.1190096971, 15.5414897832), (22.0849353293, 13.8684569817))
            Line((22.0849353293, 13.8684569817), (25.0080966055, 10.9452957055))
            Line((25.0080966055, 10.9452957055), (25.0080966055, 9.4452957055))
            Line((25.0080966055, 9.4452957055), (25.0080966055, 8.9452957055))
            Line((25.0080966055, 8.9452957055), (25.0080966055, 8.4452957055))
            Line((25.0080966055, 8.4452957055), (25.0080966055, 6.9452957055))
            Line((25.0080966055, 6.9452957055), (22.0849353293, 4.0221344294))
            ThreePointArc((22.0849353293, 4.0221344294), (21.1190096971, 2.3491016278), (22.7920419684, 3.3150281785))
            Line((22.7920419684, 3.3150281785), (25.0095772919, 5.5325659367))
            Line((25.0095772919, 5.5325659367), (25.6695344332, 6.1952957055))
            Line((25.6695344332, 6.1952957055), (26.0080966055, 6.9452957055))
            Line((26.0080966055, 6.9452957055), (26.0080966055, 8.9452957055))
        make_face()
        with BuildLine():
            Line((28.3466587777, 11.6952957055), (28.0080966055, 10.9452957055))
            Line((28.0080966055, 10.9452957055), (28.0080966055, 8.9452957055))
            Line((28.0080966055, 8.9452957055), (28.0080966055, 6.9452957055))
            Line((28.0080966055, 6.9452957055), (28.3466587777, 6.1952957055))
            Line((28.3466587777, 6.1952957055), (29.006615919, 5.5325659367))
            Line((29.006615919, 5.5325659367), (31.2241512425, 3.3150281785))
            ThreePointArc((31.2241512425, 3.3150281785), (32.8971835138, 2.3491016278), (31.9312578816, 4.0221344294))
            Line((31.9312578816, 4.0221344294), (29.0080966055, 6.9452957055))
            Line((29.0080966055, 6.9452957055), (29.0080966055, 8.4452957055))
            Line((29.0080966055, 8.4452957055), (29.0080966055, 8.9452957055))
            Line((29.0080966055, 8.9452957055), (29.0080966055, 9.4452957055))
            Line((29.0080966055, 9.4452957055), (29.0080966055, 10.9452957055))
            Line((29.0080966055, 10.9452957055), (31.9312578816, 13.8684569817))
            ThreePointArc((31.9312578816, 13.8684569817), (32.8971835138, 15.5414897832), (31.2241512425, 14.5755632326))
            Line((31.2241512425, 14.5755632326), (29.006615919, 12.3580254744))
            Line((29.006615919, 12.3580254744), (28.3466587777, 11.6952957055))
        make_face()
    extrude(amount=F3_DEPTH)

    # F0 (on Top) → F4 (join)
    with BuildSketch(Plane.XY):
        with BuildLine():
            Line((6.9919033945, 8.9452957055), (6.9919033945, 9.4452957055))
            Line((6.9919033945, 9.4452957055), (4.3689400677, 9.4452957055))
            ThreePointArc((4.3689400677, 9.4452957055), (4.2800391491, 9.5296679116), (4.1785833795, 9.5984339593))
            ThreePointArc((4.1785833795, 9.5984339593), (3.0699377683, 8.823141097), (4.3689400677, 8.4452957055))
            Line((4.3689400677, 8.4452957055), (6.9919033945, 8.4452957055))
            Line((6.9919033945, 8.4452957055), (6.9919033945, 8.9452957055))
        make_face()
        with BuildLine():
            Line((9.9919033945, 6.9452957055), (9.9919033945, 8.9452957055))
            Line((9.9919033945, 8.9452957055), (9.9919033945, 10.9452957055))
            Line((9.9919033945, 10.9452957055), (9.6533412223, 11.6952957055))
            ThreePointArc((9.6533412223, 11.6952957055), (8.9919033945, 13.4452957055), (8.3304655668, 11.6952957055))
            Line((8.3304655668, 11.6952957055), (7.9919033945, 10.9452957055))
            Line((7.9919033945, 10.9452957055), (7.9919033945, 8.9452957055))
            Line((7.9919033945, 8.9452957055), (7.9919033945, 6.9452957055))
            Line((7.9919033945, 6.9452957055), (8.3304655668, 6.1952957055))
            ThreePointArc((8.3304655668, 6.1952957055), (8.9919033945, 4.4452957055), (9.6533412223, 6.1952957055))
            Line((9.6533412223, 6.1952957055), (9.9919033945, 6.9452957055))
        make_face()
        with BuildLine():
            ThreePointArc((8.9919033945, 9.1952957055), (9.1686800898, 9.1220724008), (9.2419033945, 8.9452957055))
            ThreePointArc((9.2419033945, 8.9452957055), (9.1686800898, 8.7685190102), (8.9919033945, 8.6952957055))
            ThreePointArc((8.9919033945, 8.6952957055), (8.7419033945, 8.9452957055), (8.9919033945, 9.1952957055))
        make_face(mode=Mode.SUBTRACT)
        with BuildLine():
            Line((13.6148667214, 9.4452957055), (10.9919033945, 9.4452957055))
            Line((10.9919033945, 9.4452957055), (10.9919033945, 8.9452957055))
            Line((10.9919033945, 8.9452957055), (10.9919033945, 8.4452957055))
            Line((10.9919033945, 8.4452957055), (13.6148667214, 8.4452957055))
            ThreePointArc((13.6148667214, 8.4452957055), (14.9138690208, 8.823141097), (13.8052234095, 9.5984339593))
            ThreePointArc((13.8052234095, 9.5984339593), (13.70376764, 9.5296679116), (13.6148667214, 9.4452957055))
        make_face()
        with BuildLine():
            Line((25.0080966055, 8.9452957055), (25.0080966055, 9.4452957055))
            Line((25.0080966055, 9.4452957055), (22.3851332786, 9.4452957055))
            ThreePointArc((22.3851332786, 9.4452957055), (22.29623236, 9.5296679116), (22.1947765905, 9.5984339593))
            ThreePointArc((22.1947765905, 9.5984339593), (21.0861309792, 8.823141097), (22.3851332786, 8.4452957055))
            Line((22.3851332786, 8.4452957055), (25.0080966055, 8.4452957055))
            Line((25.0080966055, 8.4452957055), (25.0080966055, 8.9452957055))
        make_face()
        with BuildLine():
            Line((28.0080966055, 8.9452957055), (28.0080966055, 10.9452957055))
            Line((28.0080966055, 10.9452957055), (27.6695344332, 11.6952957055))
            ThreePointArc((27.6695344332, 11.6952957055), (27.0080966055, 13.4452957055), (26.3466587777, 11.6952957055))
            Line((26.3466587777, 11.6952957055), (26.0080966055, 10.9452957055))
            Line((26.0080966055, 10.9452957055), (26.0080966055, 8.9452957055))
            Line((26.0080966055, 8.9452957055), (26.0080966055, 6.9452957055))
            Line((26.0080966055, 6.9452957055), (26.3466587777, 6.1952957055))
            ThreePointArc((26.3466587777, 6.1952957055), (27.0080966055, 4.4452957055), (27.6695344332, 6.1952957055))
            Line((27.6695344332, 6.1952957055), (28.0080966055, 6.9452957055))
            Line((28.0080966055, 6.9452957055), (28.0080966055, 8.9452957055))
        make_face()
        with BuildLine():
            ThreePointArc((27.0080966055, 9.1952957055), (27.1848733008, 9.1220724008), (27.2580966055, 8.9452957055))
            ThreePointArc((27.2580966055, 8.9452957055), (27.1848733008, 8.7685190102), (27.0080966055, 8.6952957055))
            ThreePointArc((27.0080966055, 8.6952957055), (26.7580966055, 8.9452957055), (27.0080966055, 9.1952957055))
        make_face(mode=Mode.SUBTRACT)
        with BuildLine():
            Line((31.6310599323, 9.4452957055), (29.0080966055, 9.4452957055))
            Line((29.0080966055, 9.4452957055), (29.0080966055, 8.9452957055))
            Line((29.0080966055, 8.9452957055), (29.0080966055, 8.4452957055))
            Line((29.0080966055, 8.4452957055), (31.6310599323, 8.4452957055))
            ThreePointArc((31.6310599323, 8.4452957055), (32.9300622317, 8.823141097), (31.8214166205, 9.5984339593))
            ThreePointArc((31.8214166205, 9.5984339593), (31.7199608509, 9.5296679116), (31.6310599323, 9.4452957055))
        make_face()
    extrude(amount=F4_DEPTH)


solid = f1.part
